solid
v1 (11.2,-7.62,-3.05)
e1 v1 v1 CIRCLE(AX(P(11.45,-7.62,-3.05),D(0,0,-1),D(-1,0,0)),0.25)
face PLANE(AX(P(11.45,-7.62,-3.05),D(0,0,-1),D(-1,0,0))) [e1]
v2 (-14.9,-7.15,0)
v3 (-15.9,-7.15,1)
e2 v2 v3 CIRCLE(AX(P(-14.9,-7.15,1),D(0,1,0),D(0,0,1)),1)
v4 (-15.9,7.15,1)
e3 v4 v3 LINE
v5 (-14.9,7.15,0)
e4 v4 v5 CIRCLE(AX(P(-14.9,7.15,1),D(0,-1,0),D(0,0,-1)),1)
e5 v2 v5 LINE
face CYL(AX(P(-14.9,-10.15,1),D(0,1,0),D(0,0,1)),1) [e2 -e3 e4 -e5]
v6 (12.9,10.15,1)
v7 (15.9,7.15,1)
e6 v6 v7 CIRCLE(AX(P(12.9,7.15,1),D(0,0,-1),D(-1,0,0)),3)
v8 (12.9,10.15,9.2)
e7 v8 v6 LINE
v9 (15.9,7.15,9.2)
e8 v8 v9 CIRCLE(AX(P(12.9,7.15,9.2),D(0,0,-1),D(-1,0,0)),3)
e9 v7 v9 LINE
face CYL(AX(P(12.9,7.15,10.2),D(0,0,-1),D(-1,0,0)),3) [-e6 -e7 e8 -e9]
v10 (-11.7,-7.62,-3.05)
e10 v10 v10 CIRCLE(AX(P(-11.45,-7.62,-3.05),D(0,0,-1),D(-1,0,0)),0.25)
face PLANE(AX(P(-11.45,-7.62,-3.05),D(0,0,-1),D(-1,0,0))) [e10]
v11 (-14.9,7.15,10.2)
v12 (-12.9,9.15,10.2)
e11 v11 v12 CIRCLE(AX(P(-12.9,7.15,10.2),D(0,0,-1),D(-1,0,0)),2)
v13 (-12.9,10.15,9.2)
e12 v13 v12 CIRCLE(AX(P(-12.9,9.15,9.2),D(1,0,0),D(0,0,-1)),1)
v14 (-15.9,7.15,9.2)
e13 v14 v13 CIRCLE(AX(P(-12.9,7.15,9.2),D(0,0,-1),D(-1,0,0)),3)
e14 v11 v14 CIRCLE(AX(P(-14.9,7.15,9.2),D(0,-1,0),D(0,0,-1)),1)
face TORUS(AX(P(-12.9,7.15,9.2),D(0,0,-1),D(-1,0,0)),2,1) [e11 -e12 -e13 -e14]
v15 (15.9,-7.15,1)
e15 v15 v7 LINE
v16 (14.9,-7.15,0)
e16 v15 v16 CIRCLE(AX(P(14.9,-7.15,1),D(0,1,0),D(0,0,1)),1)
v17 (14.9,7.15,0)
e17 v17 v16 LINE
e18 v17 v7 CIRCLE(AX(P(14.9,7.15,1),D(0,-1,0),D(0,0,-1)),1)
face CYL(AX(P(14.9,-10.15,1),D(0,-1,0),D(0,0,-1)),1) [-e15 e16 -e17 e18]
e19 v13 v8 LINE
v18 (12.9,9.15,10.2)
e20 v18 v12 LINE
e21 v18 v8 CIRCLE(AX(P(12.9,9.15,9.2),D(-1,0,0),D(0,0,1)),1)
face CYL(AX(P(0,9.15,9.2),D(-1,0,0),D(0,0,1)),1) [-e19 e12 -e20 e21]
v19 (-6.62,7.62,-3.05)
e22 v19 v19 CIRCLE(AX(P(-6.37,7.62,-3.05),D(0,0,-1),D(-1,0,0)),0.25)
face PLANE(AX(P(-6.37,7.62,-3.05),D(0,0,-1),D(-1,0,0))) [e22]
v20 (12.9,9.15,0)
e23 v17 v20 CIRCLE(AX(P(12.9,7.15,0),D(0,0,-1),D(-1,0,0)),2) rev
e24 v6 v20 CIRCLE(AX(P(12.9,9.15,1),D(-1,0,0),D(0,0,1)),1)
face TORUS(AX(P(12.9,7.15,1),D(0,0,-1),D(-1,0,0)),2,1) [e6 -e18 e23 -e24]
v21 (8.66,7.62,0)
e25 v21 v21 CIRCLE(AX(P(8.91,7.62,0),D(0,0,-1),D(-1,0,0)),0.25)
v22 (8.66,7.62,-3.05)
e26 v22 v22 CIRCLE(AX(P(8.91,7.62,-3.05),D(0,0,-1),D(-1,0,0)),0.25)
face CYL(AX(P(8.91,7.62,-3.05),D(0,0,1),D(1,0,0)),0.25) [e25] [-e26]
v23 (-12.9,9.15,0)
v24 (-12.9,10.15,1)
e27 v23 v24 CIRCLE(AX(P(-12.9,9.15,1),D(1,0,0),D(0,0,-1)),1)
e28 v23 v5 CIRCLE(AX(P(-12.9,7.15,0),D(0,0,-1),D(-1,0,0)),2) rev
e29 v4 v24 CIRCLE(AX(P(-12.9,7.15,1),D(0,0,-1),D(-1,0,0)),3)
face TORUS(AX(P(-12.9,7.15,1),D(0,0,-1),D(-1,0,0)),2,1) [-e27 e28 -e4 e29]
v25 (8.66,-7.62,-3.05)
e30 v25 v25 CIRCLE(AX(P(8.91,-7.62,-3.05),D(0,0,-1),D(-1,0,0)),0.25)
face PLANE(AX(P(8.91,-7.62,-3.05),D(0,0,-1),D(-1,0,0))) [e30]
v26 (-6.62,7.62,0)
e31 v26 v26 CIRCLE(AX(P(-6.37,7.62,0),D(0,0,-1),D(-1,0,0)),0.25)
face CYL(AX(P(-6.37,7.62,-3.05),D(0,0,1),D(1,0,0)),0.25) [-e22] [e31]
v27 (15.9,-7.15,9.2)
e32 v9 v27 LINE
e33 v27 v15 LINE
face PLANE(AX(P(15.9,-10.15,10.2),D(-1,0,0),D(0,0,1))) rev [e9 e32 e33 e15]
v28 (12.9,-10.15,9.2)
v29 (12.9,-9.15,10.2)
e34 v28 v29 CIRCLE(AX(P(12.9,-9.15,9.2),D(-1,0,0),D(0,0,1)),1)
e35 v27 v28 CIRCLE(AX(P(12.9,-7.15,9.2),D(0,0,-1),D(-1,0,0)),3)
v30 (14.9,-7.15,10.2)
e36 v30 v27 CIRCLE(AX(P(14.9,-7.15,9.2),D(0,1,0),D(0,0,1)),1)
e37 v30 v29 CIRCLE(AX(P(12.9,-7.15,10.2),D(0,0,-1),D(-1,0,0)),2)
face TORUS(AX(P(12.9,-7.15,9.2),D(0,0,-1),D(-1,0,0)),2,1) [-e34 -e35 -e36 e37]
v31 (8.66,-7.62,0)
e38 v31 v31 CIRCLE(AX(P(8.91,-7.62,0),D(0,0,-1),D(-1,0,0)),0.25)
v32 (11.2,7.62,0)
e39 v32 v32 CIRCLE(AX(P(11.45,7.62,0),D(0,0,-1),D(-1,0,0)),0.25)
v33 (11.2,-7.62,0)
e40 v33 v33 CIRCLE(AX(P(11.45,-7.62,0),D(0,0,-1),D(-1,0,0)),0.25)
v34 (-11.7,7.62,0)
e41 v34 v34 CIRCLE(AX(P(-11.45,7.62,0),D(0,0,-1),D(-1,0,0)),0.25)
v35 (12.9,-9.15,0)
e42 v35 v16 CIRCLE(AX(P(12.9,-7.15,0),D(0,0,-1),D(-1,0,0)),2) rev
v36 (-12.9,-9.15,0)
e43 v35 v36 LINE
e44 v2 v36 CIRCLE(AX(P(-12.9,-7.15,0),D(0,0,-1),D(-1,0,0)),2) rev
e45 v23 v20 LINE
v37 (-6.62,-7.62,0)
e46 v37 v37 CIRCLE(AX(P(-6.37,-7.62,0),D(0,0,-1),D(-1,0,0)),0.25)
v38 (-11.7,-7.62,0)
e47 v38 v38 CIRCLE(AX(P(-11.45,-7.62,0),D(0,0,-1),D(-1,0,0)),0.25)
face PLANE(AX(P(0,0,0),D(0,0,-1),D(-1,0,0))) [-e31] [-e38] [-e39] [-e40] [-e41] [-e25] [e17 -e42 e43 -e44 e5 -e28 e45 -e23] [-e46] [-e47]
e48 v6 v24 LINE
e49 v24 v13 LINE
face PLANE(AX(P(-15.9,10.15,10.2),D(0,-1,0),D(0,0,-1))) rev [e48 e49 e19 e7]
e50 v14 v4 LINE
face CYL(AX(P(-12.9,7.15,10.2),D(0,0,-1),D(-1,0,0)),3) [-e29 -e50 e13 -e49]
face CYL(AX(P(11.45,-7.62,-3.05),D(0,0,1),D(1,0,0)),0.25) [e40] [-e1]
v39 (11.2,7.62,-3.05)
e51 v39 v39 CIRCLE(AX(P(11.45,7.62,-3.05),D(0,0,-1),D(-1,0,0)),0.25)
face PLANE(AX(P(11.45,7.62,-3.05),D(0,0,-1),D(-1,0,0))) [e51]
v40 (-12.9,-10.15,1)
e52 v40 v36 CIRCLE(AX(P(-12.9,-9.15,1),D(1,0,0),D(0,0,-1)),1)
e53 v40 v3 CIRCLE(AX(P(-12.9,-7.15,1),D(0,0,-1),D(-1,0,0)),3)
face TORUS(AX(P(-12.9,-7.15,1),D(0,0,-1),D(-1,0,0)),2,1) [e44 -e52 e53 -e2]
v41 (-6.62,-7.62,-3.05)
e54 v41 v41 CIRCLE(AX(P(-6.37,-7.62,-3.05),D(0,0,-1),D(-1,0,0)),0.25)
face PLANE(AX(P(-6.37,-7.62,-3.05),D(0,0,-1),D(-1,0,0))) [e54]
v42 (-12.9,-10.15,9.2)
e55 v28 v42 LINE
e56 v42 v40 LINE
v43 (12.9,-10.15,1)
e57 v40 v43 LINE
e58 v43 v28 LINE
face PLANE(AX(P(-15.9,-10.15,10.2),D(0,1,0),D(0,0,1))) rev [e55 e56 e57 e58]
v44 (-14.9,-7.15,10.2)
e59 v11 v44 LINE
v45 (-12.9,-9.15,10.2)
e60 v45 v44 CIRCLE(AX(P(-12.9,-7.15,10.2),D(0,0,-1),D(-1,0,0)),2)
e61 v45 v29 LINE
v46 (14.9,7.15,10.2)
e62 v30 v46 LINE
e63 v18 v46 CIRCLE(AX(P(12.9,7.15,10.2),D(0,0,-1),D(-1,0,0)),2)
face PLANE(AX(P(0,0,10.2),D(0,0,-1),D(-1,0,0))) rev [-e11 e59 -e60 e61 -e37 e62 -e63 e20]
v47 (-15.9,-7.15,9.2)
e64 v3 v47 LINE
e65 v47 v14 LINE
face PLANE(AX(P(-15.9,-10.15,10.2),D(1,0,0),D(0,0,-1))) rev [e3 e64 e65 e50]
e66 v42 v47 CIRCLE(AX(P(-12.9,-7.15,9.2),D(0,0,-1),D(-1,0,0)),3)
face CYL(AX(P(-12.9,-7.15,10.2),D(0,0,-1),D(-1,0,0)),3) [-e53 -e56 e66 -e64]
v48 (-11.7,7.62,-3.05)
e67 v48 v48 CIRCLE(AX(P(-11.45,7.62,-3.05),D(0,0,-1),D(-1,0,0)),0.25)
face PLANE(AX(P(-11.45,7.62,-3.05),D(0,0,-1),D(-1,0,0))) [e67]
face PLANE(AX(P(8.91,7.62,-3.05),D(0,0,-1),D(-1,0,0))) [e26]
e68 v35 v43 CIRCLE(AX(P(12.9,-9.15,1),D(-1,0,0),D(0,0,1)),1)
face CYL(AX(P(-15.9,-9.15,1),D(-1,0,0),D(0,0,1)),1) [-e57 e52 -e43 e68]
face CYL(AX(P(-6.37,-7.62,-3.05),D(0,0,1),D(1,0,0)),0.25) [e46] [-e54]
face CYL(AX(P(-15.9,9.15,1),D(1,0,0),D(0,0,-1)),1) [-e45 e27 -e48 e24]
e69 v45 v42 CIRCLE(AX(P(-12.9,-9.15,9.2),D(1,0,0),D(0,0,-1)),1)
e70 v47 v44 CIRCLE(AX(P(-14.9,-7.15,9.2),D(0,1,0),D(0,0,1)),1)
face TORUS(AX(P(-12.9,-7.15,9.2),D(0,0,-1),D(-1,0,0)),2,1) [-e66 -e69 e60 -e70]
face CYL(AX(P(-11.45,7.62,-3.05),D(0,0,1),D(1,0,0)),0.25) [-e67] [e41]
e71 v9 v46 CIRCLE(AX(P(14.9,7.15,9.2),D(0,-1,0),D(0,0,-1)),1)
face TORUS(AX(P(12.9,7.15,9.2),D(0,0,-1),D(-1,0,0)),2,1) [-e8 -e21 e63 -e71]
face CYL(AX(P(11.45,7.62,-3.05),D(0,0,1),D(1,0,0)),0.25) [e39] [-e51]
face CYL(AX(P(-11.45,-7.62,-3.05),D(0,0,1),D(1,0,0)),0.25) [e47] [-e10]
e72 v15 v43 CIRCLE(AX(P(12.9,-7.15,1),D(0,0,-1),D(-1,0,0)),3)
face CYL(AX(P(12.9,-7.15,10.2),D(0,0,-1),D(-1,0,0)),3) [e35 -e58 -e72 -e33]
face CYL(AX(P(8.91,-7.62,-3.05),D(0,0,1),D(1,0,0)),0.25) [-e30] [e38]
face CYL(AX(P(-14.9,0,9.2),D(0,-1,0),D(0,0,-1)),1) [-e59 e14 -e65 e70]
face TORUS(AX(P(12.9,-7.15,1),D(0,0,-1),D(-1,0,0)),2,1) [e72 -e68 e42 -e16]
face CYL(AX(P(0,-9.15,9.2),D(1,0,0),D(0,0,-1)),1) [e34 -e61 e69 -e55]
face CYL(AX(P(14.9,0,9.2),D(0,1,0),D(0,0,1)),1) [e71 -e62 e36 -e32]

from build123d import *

# Parameters (mm, degrees)
SKETCH_1_W      = 31.8
SKETCH_1_H      = 20.3
EXTRUDE_1_DEPTH = 10.2
FILLET_2_R      = 1
FILLET_1_R      = 3
SKETCH_2_R      = 0.25
EXTRUDE_2_DEPTH = 3.05


with BuildPart() as part:
    # Эскиз1 → Бобышка-Вытянуть1 (new body)
    with BuildSketch(Plane.XY):
        Rectangle(SKETCH_1_W, SKETCH_1_H)
    extrude(amount=EXTRUDE_1_DEPTH)

    # Скругление2
    fillet_2_edges = [part.edges().sort_by_distance(p)[0] for p in [
        (-15.9, 0, 10.2),
        (0, -10.15, 10.2),
        (15.9, 0, 10.2),
        (0, -10.15, 0),
        (-15.9, 0, 0),
        (0, 10.15, 0),
        (15.9, 0, 0),
        (0, 10.15, 10.2),
    ]]
    fillet(fillet_2_edges, radius=FILLET_2_R)

    # Скругление1
    # the kernel refuses this fillet: 3 mm, written as the material it takes off along each edge
    with BuildSketch(Plane(origin=(12.9, -7.15, 0), x_dir=(1, 0, 0), z_dir=(0, 1, 0))) as fillet_1_piece_1:
        with BuildLine():
            CenterArc((2, -1), 1, 0, 90)
            Line((3, -1), (3, 0))
            Line((3, 0), (2, 0))
        make_face()
    revolve(axis=Axis((12.9, -7.15, 0), (0, 0, -1)), revolution_arc=90, mode=Mode.SUBTRACT)
    with BuildSketch(Plane(origin=(-12.9, -7.15, 0), x_dir=(0, -1, 0), z_dir=(1, 0, 0))) as fillet_1_piece_2:
        with BuildLine():
            CenterArc((2, -1), 1, 0, 90)
            Line((3, -1), (3, 0))
            Line((3, 0), (2, 0))
        make_face()
    revolve(axis=Axis((-12.9, -7.15, 0), (0, 0, -1)), revolution_arc=90, mode=Mode.SUBTRACT)
    with BuildSketch(Plane(origin=(12.9, 7.15, 0), x_dir=(0, 1, 0), z_dir=(-1, 0, 0))) as fillet_1_piece_3:
        with BuildLine():
            CenterArc((2, -1), 1, 0, 90)
            Line((3, -1), (3, 0))
            Line((3, 0), (2, 0))
        make_face()
    revolve(axis=Axis((12.9, 7.15, 0), (0, 0, -1)), revolution_arc=90, mode=Mode.SUBTRACT)
    with BuildSketch(Plane(origin=(-12.9, 7.15, 0), x_dir=(-1, 0, 0), z_dir=(0, -1, 0))) as fillet_1_piece_4:
        with BuildLine():
            CenterArc((2, -1), 1, 0, 90)
            Line((3, -1), (3, 0))
            Line((3, 0), (2, 0))
        make_face()
    revolve(axis=Axis((-12.9, 7.15, 0), (0, 0, -1)), revolution_arc=90, mode=Mode.SUBTRACT)
    with BuildSketch(Plane(origin=(12.9, -7.15, 10.2), x_dir=(0, -1, 0), z_dir=(-1, 0, 0))) as fillet_1_piece_5:
        with BuildLine():
            CenterArc((2, -1), 1, 0, 90)
            Line((3, -1), (3, 0))
            Line((3, 0), (2, 0))
        make_face()
    revolve(axis=Axis((12.9, -7.15, 10.2), (0, 0, 1)), revolution_arc=90, mode=Mode.SUBTRACT)
    with BuildSketch(Plane(origin=(-12.9, -7.15, 10.2), x_dir=(-1, 0, 0), z_dir=(0, 1, 0))) as fillet_1_piece_6:
        with BuildLine():
            CenterArc((2, -1), 1, 0, 90)
            Line((3, -1), (3, 0))
            Line((3, 0), (2, 0))
        make_face()
    revolve(axis=Axis((-12.9, -7.15, 10.2), (0, 0, 1)), revolution_arc=90, mode=Mode.SUBTRACT)
    with BuildSketch(Plane(origin=(12.9, 7.15, 10.2), x_dir=(1, 0, 0), z_dir=(0, -1, 0))) as fillet_1_piece_7:
        with BuildLine():
            CenterArc((2, -1), 1, 0, 90)
            Line((3, -1), (3, 0))
            Line((3, 0), (2, 0))
        make_face()
    revolve(axis=Axis((12.9, 7.15, 10.2), (0, 0, 1)), revolution_arc=90, mode=Mode.SUBTRACT)
    with BuildSketch(Plane(origin=(-12.9, 7.15, 10.2), x_dir=(0, 1, 0), z_dir=(1, 0, 0))) as fillet_1_piece_8:
        with BuildLine():
            CenterArc((2, -1), 1, 0, 90)
            Line((3, -1), (3, 0))
            Line((3, 0), (2, 0))
        make_face()
    revolve(axis=Axis((-12.9, 7.15, 10.2), (0, 0, 1)), revolution_arc=90, mode=Mode.SUBTRACT)
    with BuildSketch(Plane(origin=(-15.9, 10.15, 0), x_dir=(0, -1, 0), z_dir=(0, 0, 1)), Plane(origin=(-15.9, -10.15, 0), x_dir=(1, 0, 0), z_dir=(0, 0, 1))) as fillet_1_piece_9:
        with BuildLine():
            CenterArc((FILLET_1_R, FILLET_1_R), FILLET_1_R, 180, 90)
            Line((0, FILLET_1_R), (0, 0))
            Line((0, 0), (FILLET_1_R, 0))
        make_face()
    extrude(amount=10.2, mode=Mode.SUBTRACT)
    with BuildSketch(Plane(origin=(15.9, 10.15, 0), x_dir=(0, -1, 0), z_dir=(0, 0, 1)), Plane(origin=(15.9, -10.15, 0), x_dir=(-1, 0, 0), z_dir=(0, 0, 1))) as fillet_1_piece_10:
        with BuildLine():
            CenterArc((FILLET_1_R, -FILLET_1_R), FILLET_1_R, 90, 90)
            Line((0, -FILLET_1_R), (0, 0))
            Line((0, 0), (FILLET_1_R, 0))
        make_face()
    extrude(amount=10.2, mode=Mode.SUBTRACT)

    # Эскиз2 → Бобышка-Вытянуть2 (add)
    with BuildSketch(Plane(origin=(0, 0, 0), x_dir=(-1, 0, 0), z_dir=(0, 0, -1))):
        with Locations((11.45, 7.62)):
            Circle(SKETCH_2_R)
        with Locations((6.37, 7.62)):
            Circle(SKETCH_2_R)
        with Locations((-8.91, 7.62)):
            Circle(SKETCH_2_R)
        with Locations((-11.45, 7.62)):
            Circle(SKETCH_2_R)
        with Locations((-11.45, -7.62)):
            Circle(SKETCH_2_R)
        with Locations((-8.91, -7.62)):
            Circle(SKETCH_2_R)
        with Locations((6.37, -7.62)):
            Circle(SKETCH_2_R)
        with Locations((11.45, -7.62)):
            Circle(SKETCH_2_R)
    extrude(amount=EXTRUDE_2_DEPTH)


solid = part.part
